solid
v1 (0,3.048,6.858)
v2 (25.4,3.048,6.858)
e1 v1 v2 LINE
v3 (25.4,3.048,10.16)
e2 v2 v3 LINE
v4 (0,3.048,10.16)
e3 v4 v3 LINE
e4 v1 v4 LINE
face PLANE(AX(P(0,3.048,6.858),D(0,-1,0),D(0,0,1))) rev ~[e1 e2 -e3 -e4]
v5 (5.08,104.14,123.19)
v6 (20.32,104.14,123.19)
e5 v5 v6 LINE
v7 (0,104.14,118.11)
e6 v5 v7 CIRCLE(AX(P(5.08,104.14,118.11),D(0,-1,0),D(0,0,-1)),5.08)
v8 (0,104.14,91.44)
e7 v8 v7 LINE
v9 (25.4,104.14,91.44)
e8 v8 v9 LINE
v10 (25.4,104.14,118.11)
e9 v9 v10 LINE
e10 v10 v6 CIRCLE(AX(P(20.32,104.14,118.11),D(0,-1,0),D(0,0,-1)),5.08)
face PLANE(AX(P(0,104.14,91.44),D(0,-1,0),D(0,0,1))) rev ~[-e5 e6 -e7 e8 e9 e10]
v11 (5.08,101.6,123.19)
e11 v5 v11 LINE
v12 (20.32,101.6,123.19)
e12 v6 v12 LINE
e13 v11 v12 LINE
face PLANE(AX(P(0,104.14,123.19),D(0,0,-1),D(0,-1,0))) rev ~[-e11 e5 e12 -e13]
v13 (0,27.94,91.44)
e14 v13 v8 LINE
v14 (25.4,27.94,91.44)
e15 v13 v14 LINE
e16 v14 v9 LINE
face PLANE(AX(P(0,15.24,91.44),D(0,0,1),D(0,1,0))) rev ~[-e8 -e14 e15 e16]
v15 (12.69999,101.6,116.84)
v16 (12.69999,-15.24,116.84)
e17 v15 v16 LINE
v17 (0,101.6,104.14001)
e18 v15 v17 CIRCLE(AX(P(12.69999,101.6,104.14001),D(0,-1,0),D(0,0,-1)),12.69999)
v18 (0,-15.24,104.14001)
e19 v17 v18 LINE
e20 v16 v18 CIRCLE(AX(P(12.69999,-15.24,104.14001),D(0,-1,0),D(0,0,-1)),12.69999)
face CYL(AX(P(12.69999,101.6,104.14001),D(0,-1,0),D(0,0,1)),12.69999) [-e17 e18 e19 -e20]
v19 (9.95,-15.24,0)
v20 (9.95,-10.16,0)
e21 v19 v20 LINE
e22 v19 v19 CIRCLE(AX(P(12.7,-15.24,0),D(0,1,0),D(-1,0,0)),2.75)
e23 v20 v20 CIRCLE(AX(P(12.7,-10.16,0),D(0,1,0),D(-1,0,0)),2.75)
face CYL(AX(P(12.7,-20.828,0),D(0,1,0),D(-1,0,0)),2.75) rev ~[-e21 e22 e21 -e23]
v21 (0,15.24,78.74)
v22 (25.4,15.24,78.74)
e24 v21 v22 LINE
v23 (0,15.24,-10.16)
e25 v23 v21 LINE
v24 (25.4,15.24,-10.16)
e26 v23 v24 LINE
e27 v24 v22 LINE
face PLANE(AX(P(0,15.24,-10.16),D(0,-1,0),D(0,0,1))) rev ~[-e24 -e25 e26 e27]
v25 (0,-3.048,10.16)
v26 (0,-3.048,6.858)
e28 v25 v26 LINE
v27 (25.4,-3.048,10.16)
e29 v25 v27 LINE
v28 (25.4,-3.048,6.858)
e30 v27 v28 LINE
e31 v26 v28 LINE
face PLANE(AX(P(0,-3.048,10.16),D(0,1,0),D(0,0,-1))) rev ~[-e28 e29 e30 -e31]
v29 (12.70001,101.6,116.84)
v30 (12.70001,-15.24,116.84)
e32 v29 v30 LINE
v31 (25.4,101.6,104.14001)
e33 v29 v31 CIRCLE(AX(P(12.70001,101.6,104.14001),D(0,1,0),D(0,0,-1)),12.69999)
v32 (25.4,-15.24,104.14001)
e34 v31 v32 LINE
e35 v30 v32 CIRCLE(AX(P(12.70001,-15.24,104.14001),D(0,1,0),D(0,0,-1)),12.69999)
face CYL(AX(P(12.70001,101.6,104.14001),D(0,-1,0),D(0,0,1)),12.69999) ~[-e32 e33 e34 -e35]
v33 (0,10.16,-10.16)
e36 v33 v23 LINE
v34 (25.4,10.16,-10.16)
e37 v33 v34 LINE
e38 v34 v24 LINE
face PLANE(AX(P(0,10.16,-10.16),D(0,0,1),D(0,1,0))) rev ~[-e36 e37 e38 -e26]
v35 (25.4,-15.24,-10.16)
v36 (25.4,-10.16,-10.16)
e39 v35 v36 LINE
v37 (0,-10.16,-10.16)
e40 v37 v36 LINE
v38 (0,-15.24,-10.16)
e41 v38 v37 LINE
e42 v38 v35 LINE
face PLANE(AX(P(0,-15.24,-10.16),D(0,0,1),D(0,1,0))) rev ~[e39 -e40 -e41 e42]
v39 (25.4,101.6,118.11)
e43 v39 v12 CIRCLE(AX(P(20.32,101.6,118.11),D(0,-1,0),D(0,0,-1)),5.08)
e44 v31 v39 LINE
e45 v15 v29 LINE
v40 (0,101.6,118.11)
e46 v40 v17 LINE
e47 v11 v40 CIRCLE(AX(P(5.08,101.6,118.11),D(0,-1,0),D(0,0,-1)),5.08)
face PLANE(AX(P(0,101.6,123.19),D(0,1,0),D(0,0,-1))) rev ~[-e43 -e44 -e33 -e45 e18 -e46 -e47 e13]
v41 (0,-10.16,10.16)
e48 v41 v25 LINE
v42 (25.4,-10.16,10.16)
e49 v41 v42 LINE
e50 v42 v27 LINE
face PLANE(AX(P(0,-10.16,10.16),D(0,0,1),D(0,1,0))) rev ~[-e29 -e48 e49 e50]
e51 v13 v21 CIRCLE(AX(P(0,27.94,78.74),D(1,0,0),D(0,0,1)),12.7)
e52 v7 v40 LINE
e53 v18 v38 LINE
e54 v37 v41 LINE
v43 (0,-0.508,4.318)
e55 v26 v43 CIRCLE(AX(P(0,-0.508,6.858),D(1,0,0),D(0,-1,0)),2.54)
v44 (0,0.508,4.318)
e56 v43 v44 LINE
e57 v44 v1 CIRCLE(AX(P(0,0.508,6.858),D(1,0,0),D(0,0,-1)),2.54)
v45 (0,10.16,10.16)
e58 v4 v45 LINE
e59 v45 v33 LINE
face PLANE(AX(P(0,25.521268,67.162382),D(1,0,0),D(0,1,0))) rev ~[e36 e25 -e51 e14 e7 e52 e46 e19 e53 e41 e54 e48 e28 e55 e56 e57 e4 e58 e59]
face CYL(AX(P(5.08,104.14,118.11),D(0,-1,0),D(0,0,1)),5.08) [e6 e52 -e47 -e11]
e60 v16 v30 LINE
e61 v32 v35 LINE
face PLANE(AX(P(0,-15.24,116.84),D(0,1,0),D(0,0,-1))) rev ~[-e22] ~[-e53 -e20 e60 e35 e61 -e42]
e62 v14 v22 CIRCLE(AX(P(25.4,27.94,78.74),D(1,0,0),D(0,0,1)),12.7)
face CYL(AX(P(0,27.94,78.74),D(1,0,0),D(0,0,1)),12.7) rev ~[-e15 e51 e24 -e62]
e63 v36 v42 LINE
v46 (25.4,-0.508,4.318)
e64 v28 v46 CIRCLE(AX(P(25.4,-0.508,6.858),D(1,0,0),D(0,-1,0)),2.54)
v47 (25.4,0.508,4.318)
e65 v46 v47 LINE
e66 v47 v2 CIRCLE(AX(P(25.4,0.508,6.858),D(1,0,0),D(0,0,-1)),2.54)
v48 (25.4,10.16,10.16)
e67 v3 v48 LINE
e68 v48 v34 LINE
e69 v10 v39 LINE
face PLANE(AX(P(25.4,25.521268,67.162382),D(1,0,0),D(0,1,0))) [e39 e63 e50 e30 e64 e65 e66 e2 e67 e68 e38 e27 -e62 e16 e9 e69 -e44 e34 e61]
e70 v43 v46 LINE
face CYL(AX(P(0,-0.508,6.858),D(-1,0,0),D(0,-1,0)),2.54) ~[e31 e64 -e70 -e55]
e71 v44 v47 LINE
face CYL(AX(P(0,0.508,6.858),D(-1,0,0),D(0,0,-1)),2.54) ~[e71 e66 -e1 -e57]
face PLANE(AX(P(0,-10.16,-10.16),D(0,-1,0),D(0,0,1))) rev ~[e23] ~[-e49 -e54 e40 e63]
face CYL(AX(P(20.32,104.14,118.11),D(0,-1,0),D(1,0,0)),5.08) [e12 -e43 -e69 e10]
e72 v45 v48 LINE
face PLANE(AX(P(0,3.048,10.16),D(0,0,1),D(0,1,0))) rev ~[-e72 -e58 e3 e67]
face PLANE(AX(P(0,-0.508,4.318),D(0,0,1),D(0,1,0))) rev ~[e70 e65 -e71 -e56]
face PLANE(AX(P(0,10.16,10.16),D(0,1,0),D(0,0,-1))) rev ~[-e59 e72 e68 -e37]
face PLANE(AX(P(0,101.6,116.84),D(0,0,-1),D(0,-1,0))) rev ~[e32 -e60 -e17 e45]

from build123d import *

# Parameters (mm, degrees)
F1_DEPTH = 25.4
F2_R     = 12.69999
F3_R     = 5.08
F4_R     = 12.7
F6_D     = 5.5
F6_DEPTH = 5.588
F6_TIP   = 1.6523667023


# Not quite as in the source:
# - a fillet or chamfer is up to 0.001 mm smaller than in the source, because OpenCascade refuses the exact size


with BuildPart() as f1:
    # F0 (on Right) → F1 (new body)
    with BuildSketch(Plane.YZ):
        with BuildLine():
            Line((3.048, 10.16), (10.16, 10.16))
            Line((10.16, 10.16), (10.16, -10.16))
            Line((10.16, -10.16), (15.24, -10.16))
            Line((15.24, -10.16), (15.24, 91.44))
            Line((15.24, 91.44), (104.14, 91.44))
            Line((104.14, 91.44), (104.14, 123.19))
            Line((104.14, 123.19), (101.6, 123.19))
            Line((101.6, 123.19), (101.6, 116.84))
            Line((101.6, 116.84), (-15.24, 116.84))
            Line((-15.24, 116.84), (-15.24, -10.16))
            Line((-15.24, -10.16), (-10.16, -10.16))
            Line((-10.16, -10.16), (-10.16, 10.16))
            Line((-10.16, 10.16), (-3.048, 10.16))
            Line((-3.048, 10.16), (-3.048, 6.858))
            ThreePointArc((-3.048, 6.858), (-2.3040512242, 5.0619487758), (-0.508, 4.318))
            Line((-0.508, 4.318), (0.508, 4.318))
            ThreePointArc((0.508, 4.318), (2.3040512242, 5.0619487758), (3.048, 6.858))
            Line((3.048, 6.858), (3.048, 10.16))
        make_face()
    extrude(amount=F1_DEPTH)

    # F2 (radius 12.7 in the source; OpenCascade refuses exactly that, so slightly less here)
    f2_edges = [f1.edges().sort_by_distance(p)[0] for p in [
        (25.4, 43.18, 116.84),
        (0, 43.18, 116.84),
    ]]
    fillet(f2_edges, radius=F2_R)

    # F3
    f3_edges = [f1.edges().sort_by_distance(p)[0] for p in [
        (0, 102.87, 123.19),
        (25.4, 102.87, 123.19),
    ]]
    fillet(f3_edges, radius=F3_R)

    # F4
    f4_edges = [f1.edges().sort_by_distance(p)[0] for p in [
        (12.7, 15.24, 91.44),
    ]]
    fillet(f4_edges, radius=F4_R)

    # F6
    with Locations(Plane.XZ.offset(15.24)):
        with Locations((12.7, 0)):
            Hole(F6_D / 2, depth=F6_DEPTH)
            with Locations((0, 0, -(F6_DEPTH + F6_TIP / 2))):  # 118° drill point
                Cone(0, F6_D / 2, F6_TIP, mode=Mode.SUBTRACT)


solid = f1.part
